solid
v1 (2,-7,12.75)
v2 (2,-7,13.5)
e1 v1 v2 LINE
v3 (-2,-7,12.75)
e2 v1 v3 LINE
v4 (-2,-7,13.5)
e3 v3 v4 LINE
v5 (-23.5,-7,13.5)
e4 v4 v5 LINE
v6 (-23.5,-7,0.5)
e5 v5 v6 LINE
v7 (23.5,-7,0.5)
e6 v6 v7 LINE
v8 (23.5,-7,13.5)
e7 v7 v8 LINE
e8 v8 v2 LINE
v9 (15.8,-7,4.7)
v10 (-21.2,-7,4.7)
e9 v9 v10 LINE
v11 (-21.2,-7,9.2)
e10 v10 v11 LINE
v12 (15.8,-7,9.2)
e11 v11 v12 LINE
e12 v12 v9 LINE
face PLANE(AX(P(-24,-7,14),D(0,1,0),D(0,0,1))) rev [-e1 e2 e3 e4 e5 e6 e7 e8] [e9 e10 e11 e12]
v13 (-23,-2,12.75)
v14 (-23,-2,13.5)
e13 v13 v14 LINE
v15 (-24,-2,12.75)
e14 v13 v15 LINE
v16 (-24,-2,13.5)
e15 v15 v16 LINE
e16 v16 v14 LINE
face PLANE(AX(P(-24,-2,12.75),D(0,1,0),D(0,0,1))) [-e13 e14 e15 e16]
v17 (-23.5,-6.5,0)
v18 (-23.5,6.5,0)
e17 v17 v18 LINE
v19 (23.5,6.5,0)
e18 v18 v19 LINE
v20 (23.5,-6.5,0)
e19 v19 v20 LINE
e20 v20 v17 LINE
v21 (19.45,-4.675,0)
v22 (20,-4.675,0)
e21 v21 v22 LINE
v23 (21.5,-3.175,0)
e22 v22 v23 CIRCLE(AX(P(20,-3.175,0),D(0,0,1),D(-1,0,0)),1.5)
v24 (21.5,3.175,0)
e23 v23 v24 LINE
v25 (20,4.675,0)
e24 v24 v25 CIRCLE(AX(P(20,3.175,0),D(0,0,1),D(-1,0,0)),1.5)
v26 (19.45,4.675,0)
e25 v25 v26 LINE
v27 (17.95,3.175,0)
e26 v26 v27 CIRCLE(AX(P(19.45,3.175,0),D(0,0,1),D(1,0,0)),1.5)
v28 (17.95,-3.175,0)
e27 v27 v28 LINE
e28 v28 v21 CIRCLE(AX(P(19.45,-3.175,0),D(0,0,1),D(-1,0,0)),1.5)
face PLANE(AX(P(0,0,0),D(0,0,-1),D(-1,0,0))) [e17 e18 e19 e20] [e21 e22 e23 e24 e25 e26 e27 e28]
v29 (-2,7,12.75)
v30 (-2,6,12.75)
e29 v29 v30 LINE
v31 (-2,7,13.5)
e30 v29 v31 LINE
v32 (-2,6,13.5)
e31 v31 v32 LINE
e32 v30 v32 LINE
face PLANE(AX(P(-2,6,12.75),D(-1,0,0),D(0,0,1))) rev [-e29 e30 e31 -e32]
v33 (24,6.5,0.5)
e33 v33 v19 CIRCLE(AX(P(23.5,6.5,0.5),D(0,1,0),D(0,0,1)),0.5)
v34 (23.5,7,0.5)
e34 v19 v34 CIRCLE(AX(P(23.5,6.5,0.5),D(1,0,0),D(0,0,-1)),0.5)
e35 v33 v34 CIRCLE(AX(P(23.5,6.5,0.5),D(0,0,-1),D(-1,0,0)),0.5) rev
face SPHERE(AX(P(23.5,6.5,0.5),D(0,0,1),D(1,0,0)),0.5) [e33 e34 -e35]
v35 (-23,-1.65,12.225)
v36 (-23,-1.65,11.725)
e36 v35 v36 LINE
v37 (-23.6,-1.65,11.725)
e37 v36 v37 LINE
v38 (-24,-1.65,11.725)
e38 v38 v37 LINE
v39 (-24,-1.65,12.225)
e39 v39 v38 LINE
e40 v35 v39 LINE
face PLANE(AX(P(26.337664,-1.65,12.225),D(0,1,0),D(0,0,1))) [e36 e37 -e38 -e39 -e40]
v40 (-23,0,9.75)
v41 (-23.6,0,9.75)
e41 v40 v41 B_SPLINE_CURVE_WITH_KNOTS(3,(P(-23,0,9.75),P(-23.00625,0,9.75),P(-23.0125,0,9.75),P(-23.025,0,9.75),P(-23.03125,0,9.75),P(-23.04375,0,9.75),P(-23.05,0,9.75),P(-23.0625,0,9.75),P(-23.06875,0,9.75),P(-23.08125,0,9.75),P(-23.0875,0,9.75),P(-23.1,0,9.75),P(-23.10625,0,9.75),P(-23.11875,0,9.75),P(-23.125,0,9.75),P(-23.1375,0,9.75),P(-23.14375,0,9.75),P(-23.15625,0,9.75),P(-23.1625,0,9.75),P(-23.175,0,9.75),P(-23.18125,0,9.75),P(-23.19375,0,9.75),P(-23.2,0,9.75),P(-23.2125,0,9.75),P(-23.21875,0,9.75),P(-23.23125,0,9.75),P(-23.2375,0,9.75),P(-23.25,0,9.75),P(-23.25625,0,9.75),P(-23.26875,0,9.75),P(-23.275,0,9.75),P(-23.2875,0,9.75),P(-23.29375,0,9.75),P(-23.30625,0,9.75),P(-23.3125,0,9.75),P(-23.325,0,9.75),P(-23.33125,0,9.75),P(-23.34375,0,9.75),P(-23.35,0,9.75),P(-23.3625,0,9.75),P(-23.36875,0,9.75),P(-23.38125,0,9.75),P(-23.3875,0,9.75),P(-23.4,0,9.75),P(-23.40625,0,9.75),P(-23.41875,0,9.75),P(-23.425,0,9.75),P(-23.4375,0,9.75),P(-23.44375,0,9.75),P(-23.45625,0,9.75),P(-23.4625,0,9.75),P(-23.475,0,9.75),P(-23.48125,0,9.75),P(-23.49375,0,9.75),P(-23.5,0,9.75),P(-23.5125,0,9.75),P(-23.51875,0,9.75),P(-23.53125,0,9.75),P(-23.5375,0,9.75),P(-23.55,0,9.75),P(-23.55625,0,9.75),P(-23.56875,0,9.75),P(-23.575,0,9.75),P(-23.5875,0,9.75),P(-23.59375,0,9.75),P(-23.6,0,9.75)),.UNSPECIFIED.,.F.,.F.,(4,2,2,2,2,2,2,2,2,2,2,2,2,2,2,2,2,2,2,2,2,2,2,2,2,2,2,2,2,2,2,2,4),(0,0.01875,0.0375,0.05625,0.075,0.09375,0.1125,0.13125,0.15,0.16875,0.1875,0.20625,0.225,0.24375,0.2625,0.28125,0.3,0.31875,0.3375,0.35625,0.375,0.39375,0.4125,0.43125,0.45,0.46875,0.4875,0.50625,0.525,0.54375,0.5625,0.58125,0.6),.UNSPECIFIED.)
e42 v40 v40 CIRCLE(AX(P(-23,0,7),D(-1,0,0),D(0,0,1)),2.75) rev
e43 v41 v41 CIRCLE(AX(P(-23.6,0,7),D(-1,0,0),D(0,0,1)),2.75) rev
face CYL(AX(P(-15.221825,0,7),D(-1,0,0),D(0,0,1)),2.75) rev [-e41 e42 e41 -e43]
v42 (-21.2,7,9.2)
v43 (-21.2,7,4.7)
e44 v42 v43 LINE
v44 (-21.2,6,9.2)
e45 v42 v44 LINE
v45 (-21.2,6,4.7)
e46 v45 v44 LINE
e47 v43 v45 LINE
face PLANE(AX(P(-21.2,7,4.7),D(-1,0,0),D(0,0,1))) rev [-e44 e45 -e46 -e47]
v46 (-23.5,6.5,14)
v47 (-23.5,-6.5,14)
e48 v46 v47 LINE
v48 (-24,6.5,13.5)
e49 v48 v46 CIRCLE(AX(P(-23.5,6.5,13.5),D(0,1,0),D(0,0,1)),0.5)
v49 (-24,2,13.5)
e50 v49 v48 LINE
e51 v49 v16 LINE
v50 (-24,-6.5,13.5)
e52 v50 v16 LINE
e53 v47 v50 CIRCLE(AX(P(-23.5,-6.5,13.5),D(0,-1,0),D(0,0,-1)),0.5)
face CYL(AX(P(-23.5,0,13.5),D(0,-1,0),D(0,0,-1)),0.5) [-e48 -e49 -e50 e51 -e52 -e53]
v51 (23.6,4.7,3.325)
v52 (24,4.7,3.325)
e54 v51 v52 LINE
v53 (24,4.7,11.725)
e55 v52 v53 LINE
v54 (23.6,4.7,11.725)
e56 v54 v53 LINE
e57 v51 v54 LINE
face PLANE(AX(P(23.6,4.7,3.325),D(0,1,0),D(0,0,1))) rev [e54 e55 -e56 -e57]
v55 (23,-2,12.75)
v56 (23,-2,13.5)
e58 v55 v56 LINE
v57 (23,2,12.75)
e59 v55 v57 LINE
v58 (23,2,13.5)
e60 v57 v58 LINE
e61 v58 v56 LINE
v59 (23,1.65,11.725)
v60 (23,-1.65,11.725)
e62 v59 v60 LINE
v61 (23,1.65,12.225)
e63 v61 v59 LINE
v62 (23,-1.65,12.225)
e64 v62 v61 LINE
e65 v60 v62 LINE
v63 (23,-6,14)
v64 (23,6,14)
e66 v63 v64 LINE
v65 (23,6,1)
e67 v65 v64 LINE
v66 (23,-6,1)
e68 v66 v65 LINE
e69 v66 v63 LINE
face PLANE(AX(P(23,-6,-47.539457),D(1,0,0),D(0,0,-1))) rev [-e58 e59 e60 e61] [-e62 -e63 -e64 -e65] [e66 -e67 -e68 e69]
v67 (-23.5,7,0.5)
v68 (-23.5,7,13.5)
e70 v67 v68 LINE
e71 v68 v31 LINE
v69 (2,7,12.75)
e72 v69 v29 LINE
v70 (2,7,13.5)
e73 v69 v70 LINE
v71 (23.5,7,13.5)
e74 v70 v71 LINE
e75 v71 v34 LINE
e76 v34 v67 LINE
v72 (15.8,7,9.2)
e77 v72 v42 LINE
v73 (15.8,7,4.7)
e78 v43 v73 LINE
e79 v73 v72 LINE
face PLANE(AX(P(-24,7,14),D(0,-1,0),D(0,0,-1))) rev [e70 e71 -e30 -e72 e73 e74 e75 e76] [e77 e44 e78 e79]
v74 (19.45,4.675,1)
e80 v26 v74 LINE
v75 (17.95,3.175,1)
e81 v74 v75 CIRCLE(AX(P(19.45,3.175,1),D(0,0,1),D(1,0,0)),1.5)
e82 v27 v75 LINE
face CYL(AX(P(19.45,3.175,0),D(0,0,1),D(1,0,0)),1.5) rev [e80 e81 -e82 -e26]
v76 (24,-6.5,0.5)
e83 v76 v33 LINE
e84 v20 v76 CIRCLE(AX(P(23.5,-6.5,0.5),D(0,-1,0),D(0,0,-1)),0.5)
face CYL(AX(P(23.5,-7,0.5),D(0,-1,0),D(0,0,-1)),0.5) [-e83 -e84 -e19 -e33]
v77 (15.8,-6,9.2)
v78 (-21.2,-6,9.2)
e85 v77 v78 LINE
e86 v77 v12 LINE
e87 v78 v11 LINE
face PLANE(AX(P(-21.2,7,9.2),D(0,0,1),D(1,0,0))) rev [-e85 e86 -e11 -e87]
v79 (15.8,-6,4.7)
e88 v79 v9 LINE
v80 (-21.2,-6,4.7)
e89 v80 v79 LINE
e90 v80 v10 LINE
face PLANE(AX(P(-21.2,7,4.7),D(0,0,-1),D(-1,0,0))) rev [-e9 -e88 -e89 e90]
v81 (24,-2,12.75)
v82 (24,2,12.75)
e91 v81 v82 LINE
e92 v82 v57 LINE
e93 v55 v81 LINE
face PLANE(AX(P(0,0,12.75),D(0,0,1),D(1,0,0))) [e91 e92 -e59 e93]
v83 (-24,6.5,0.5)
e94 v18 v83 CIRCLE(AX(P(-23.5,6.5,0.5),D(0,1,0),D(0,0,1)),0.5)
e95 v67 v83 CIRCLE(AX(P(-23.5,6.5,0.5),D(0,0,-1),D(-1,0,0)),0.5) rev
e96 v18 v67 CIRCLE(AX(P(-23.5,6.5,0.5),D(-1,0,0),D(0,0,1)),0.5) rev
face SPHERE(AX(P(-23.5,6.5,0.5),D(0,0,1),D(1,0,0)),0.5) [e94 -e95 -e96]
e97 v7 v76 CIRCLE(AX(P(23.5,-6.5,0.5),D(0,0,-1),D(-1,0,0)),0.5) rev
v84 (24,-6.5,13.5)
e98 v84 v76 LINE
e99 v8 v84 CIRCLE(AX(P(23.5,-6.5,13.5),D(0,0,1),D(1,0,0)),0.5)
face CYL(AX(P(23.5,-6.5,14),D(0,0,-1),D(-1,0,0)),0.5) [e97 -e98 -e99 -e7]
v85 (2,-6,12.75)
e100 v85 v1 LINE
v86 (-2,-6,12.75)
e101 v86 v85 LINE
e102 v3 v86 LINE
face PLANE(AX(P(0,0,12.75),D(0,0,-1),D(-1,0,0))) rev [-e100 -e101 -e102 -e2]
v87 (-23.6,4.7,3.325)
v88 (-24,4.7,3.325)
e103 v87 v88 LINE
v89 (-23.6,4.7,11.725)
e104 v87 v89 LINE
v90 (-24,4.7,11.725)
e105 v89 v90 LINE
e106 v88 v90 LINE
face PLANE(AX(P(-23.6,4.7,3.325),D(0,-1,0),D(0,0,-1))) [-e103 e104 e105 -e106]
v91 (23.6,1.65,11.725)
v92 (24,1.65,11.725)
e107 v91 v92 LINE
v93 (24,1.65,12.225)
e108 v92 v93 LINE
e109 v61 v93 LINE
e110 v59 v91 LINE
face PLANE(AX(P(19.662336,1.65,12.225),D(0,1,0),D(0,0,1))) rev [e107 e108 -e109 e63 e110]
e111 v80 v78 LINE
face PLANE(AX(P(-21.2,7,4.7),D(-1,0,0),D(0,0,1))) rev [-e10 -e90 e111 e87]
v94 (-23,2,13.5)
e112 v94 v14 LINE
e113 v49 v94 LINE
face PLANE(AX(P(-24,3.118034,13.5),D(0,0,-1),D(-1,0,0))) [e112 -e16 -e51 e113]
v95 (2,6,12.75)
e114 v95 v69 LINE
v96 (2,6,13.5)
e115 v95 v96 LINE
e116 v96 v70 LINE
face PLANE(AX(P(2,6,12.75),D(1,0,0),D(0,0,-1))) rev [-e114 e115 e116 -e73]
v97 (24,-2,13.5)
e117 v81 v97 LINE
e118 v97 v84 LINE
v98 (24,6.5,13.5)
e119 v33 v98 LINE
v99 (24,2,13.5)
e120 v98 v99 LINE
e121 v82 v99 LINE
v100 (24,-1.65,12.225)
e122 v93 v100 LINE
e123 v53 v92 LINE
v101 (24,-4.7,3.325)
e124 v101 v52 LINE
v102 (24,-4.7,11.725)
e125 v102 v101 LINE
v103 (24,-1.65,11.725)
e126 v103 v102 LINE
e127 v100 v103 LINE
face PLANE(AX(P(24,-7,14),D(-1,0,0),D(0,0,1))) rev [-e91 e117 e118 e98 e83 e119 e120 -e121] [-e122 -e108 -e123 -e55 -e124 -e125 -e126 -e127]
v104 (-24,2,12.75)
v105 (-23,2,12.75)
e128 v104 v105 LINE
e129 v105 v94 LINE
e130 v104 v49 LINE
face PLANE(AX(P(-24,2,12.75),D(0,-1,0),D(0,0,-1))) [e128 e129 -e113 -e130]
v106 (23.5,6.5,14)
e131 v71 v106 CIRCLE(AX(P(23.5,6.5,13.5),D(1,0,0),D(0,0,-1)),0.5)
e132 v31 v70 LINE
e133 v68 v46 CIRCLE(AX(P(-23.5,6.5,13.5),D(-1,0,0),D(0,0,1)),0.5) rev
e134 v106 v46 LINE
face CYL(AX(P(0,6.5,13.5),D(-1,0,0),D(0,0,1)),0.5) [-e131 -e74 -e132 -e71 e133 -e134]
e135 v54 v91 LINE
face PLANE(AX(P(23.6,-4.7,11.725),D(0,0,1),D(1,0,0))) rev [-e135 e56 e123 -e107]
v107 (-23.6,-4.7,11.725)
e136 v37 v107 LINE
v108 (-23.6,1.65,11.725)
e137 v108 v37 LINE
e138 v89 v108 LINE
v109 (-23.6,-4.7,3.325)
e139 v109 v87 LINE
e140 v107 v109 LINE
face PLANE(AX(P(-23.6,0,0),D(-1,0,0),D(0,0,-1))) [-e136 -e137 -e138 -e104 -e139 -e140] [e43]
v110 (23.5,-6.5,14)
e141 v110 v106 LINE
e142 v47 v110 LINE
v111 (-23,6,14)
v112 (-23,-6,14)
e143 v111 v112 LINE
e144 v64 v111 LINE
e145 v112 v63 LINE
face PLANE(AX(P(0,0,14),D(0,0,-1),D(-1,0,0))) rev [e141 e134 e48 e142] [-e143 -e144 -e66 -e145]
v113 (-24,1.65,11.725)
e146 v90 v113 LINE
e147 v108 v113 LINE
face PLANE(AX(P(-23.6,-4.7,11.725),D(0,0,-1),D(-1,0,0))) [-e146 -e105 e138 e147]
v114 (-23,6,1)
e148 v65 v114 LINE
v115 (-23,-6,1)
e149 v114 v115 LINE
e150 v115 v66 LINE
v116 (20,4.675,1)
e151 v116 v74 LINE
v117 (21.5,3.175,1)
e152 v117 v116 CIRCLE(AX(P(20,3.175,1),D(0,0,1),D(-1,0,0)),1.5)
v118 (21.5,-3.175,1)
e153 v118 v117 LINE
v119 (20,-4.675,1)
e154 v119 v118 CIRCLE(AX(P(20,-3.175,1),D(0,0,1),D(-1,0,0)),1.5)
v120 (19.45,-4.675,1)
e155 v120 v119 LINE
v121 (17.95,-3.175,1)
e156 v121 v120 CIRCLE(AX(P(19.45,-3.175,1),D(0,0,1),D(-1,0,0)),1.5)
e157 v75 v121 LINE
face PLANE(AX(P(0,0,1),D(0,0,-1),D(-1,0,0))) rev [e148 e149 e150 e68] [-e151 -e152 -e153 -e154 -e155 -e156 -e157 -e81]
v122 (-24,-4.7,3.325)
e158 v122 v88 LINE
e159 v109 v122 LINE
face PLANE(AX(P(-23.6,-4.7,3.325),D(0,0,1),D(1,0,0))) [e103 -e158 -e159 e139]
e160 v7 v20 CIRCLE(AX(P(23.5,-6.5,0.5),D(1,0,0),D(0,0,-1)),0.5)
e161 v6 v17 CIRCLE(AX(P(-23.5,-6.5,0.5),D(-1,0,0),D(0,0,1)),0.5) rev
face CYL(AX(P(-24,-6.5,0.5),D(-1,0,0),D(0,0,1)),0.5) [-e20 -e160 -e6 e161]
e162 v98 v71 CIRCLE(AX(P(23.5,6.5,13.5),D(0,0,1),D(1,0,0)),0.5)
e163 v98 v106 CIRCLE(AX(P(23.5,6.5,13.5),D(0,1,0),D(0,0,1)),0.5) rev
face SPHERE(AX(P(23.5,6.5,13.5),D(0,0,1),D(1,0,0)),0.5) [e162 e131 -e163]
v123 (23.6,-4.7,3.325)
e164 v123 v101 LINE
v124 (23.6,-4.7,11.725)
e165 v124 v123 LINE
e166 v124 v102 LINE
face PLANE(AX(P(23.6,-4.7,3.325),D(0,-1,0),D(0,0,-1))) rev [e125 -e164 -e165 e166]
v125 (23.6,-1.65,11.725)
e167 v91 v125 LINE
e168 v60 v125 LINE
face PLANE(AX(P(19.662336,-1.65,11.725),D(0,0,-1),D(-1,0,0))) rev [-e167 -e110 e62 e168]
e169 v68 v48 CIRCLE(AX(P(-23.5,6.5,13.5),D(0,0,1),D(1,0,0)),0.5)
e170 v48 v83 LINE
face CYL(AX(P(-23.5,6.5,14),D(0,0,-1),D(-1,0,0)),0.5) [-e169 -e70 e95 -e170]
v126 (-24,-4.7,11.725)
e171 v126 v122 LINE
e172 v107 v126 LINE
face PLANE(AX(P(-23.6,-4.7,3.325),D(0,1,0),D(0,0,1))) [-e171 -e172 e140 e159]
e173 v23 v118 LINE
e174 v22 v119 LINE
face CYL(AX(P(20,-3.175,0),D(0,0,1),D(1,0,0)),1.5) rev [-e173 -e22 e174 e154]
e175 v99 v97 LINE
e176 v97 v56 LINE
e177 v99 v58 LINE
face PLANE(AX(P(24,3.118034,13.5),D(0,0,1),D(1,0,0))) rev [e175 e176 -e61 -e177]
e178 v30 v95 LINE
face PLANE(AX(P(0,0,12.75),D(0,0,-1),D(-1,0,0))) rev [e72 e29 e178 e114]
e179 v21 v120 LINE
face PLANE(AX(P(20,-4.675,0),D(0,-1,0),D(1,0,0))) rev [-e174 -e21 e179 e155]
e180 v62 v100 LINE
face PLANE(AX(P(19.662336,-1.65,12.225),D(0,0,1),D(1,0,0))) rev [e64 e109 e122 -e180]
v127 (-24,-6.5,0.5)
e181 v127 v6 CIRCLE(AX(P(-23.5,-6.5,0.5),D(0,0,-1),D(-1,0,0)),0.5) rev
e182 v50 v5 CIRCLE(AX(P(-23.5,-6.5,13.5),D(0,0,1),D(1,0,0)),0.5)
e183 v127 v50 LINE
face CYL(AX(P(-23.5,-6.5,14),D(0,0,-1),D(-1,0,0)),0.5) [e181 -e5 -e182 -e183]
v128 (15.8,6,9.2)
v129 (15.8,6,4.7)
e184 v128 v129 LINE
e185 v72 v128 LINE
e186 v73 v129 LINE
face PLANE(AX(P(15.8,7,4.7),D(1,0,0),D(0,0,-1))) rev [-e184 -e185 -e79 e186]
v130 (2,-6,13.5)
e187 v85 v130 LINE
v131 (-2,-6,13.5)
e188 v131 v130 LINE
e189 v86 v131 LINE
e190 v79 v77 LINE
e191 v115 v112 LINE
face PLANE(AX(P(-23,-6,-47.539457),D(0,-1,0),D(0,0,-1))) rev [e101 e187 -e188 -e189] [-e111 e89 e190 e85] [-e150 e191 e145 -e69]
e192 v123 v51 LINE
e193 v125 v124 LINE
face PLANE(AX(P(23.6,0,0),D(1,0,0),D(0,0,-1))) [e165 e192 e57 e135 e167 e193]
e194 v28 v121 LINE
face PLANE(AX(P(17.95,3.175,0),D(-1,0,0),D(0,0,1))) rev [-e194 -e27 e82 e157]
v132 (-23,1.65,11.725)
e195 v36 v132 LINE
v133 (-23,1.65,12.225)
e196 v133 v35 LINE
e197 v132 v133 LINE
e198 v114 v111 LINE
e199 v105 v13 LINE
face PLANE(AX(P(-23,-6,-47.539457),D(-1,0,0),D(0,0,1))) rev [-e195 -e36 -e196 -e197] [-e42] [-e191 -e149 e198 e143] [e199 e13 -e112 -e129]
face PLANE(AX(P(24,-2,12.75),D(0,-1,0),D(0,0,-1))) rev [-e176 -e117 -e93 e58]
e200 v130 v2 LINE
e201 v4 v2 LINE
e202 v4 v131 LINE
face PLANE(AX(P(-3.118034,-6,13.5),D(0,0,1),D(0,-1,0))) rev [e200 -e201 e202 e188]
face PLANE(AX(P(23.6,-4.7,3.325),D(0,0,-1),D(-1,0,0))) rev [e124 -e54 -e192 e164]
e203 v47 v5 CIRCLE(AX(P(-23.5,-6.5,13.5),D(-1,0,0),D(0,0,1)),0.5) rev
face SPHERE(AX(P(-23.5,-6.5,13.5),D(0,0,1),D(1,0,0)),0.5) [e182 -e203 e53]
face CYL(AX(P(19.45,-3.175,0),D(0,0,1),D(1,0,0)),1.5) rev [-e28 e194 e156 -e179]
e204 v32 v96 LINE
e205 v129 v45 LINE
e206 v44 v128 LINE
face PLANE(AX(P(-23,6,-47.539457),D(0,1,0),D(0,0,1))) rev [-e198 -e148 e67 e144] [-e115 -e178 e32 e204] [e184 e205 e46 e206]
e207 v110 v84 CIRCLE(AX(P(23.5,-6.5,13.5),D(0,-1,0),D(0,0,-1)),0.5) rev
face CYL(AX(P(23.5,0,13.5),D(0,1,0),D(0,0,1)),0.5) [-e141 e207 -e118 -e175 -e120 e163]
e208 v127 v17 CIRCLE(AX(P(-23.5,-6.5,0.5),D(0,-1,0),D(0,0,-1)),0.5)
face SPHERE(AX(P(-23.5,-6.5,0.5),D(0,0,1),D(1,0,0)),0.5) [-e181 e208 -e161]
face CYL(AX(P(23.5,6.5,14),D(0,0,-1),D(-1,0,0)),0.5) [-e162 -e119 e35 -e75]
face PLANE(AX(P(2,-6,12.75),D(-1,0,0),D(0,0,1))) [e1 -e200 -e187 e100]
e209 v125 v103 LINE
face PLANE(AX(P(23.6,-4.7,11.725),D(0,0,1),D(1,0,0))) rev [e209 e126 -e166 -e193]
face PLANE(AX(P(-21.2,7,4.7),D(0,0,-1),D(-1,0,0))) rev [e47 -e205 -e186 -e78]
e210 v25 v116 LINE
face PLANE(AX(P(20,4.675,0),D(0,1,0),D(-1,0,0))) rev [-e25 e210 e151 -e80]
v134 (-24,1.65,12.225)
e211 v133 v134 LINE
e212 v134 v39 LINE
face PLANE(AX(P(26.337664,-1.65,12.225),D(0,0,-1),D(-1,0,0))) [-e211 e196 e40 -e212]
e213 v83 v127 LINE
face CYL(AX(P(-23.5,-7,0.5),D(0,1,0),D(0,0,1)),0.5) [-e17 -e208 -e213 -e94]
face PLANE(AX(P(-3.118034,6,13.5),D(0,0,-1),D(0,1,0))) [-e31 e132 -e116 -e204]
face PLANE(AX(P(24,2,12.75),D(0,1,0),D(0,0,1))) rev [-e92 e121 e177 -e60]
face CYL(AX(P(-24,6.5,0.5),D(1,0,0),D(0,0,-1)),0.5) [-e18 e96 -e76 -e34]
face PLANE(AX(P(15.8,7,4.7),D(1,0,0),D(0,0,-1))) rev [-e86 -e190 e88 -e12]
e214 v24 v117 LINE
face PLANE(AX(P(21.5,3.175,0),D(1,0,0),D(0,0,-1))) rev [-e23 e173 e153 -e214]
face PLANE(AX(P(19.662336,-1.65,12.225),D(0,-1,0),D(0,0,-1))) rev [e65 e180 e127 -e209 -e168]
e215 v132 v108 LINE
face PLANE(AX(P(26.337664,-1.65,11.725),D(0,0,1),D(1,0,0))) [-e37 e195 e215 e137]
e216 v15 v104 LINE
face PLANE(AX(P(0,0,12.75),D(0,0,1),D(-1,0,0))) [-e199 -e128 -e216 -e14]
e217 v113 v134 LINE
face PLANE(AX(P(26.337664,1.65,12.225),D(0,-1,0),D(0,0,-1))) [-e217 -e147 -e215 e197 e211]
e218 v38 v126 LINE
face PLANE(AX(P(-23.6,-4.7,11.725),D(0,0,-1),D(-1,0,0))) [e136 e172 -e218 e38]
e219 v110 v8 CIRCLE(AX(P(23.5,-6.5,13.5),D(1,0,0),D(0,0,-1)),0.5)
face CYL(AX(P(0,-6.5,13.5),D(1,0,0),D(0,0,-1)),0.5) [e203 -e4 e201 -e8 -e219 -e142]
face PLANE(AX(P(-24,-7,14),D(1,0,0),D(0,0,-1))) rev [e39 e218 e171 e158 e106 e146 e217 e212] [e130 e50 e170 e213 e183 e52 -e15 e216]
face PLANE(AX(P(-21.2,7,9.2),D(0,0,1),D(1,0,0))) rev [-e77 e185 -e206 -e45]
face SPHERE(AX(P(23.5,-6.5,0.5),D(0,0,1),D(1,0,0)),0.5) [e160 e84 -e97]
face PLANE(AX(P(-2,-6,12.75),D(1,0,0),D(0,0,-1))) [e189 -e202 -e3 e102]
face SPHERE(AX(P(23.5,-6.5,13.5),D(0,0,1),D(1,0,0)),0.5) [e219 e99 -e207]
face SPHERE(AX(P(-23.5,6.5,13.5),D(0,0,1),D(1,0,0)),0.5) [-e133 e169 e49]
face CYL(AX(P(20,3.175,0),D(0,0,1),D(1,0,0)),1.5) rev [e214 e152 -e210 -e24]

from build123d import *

# Parameters (mm, degrees)
SKETCH3_W               = 48
SKETCH3_H               = 14
BOSS_EXTRUDE2_DEPTH     = 14
SKETCH4_W               = 46
SKETCH4_H               = 12
CUT_EXTRUDE1_DEPTH      = 13
FILLET1_R               = 0.5
CUT_EXTRUDE2_DEPTH      = 32.112698372
CUT_EXTRUDE2_DEPTH_BACK = 32.112698372
SKETCH6_W               = 37
SKETCH6_H               = 4.5
SKETCH14_W              = 4
SKETCH14_H              = 1
CUT_EXTRUDE8_DEPTH      = 1.25
SKETCH15_W              = 1
SKETCH15_H              = 4
CUT_EXTRUDE9_DEPTH      = 1.25
CUT_EXTRUDE10_DEPTH     = 29.178005607
SKETCH20_W              = 1.2
SKETCH20_H              = 11
BOSS_EXTRUDE3_DEPTH     = 3
FILLET2_R               = 0.5
FILLET2_OF_MIRROR4_R    = 0.5
SKETCH24_R              = 2.75
CUT_EXTRUDE14_DEPTH     = 1
SKETCH25_W              = 0.6
SKETCH25_H              = 12
BOSS_EXTRUDE4_DEPTH     = 2.3
SKETCH28_W              = 8.4
SKETCH28_H              = 9.4
CUT_EXTRUDE15_DEPTH     = 0.4
SKETCH30_W              = 0.7
SKETCH30_H              = 12
BOSS_EXTRUDE6_DEPTH     = 11.75
CUT_EXTRUDE22_REACH     = 52.488
SKETCH38_W              = 0.5
SKETCH38_H              = 3.3
SKETCH39_W              = 0.6
SKETCH39_H              = 1.25
BOSS_EXTRUDE7_DEPTH     = 8.7
FILLET5_R               = 5
MIRROR5_START           = 3.325
MIRROR5_OUTLINE_W       = 0.4
MIRROR5_OUTLINE_H       = 9.4
MIRROR5_DEPTH           = 8.4
MIRROR5_START_2         = 11.725
MIRROR5_2_OUTLINE_W     = 1
MIRROR5_2_OUTLINE_H     = 3.3
MIRROR5_2_OUTLINE_W_2   = 0.7
MIRROR5_2_DEPTH         = 0.5
SKETCH36_W              = 0.7
SKETCH36_H              = 12
CUT_EXTRUDE23_DEPTH     = 11.75
SKETCH40_W              = 1.8
SKETCH40_H              = 12
CUT_EXTRUDE24_DEPTH     = 11
BOSS_EXTRUDE8_START     = 4
BOSS_EXTRUDE8_DEPTH     = 4
BOSS_EXTRUDE9_DEPTH     = 4


# Read off the part's stored shape, not the designer's step: Mirror5
with BuildPart() as part:
    # Sketch3 → Boss-Extrude2 (new body)
    with BuildSketch(Plane.XY):
        Rectangle(SKETCH3_W, SKETCH3_H)
    extrude(amount=BOSS_EXTRUDE2_DEPTH)

    # Sketch4 → Cut-Extrude1 (cut)
    with BuildSketch(Plane.XY.offset(14)):
        Rectangle(SKETCH4_W, SKETCH4_H)
    extrude(amount=-CUT_EXTRUDE1_DEPTH, mode=Mode.SUBTRACT)

    # Fillet1
    fillet1_edges = [part.edges().sort_by_distance(p)[0] for p in [
        (-24, 0, 14),
        (0, -7, 14),
        (24, 0, 14),
        (0, -7, 0),
        (-24, 0, 0),
        (0, 7, 0),
        (24, 0, 0),
        (24, -7, 7),
        (-24, -7, 7),
        (-24, 7, 7),
        (24, 7, 7),
        (0, 7, 14),
    ]]
    fillet(fillet1_edges, radius=FILLET1_R)

    # Sketch6 → Cut-Extrude2 (cut, two sides: drawn at the far end of the back side and taken through both)
    with BuildSketch(Plane.XZ.offset(7).offset(-CUT_EXTRUDE2_DEPTH_BACK)):
        with Locations((-2.7, 6.95)):
            Rectangle(SKETCH6_W, SKETCH6_H)
    extrude(amount=CUT_EXTRUDE2_DEPTH + CUT_EXTRUDE2_DEPTH_BACK, mode=Mode.SUBTRACT)

    # Sketch14 → Cut-Extrude8 (cut)
    with BuildSketch(Plane.XY.offset(14)):
        with Locations((0, 6.5)):
            Rectangle(SKETCH14_W, SKETCH14_H)
    cut_extrude8 = extrude(amount=-CUT_EXTRUDE8_DEPTH, mode=Mode.SUBTRACT)

    # Mirror1: Cut-Extrude8 across plane
    add(cut_extrude8.mirror(Plane(origin=(0, 0, 0), x_dir=(0, 0, 1), z_dir=(0, -1, 0))), mode=Mode.SUBTRACT)

    # Sketch15 → Cut-Extrude9 (cut)
    with BuildSketch(Plane.XY.offset(14)):
        with Locations((23.5, 0)):
            Rectangle(SKETCH15_W, SKETCH15_H)
    cut_extrude9 = extrude(amount=-CUT_EXTRUDE9_DEPTH, mode=Mode.SUBTRACT)

    # Mirror3: Cut-Extrude9 across plane
    add(cut_extrude9.mirror(Plane.ZY), mode=Mode.SUBTRACT)

    # Sketch17 → Cut-Extrude10 (cut, through all)
    with BuildSketch(Plane.XY.offset(1)):
        with BuildLine():
            Line((20, 4.675), (19.45, 4.675))
            ThreePointArc((19.45, 4.675), (18.389339828, 4.235660172), (17.95, 3.175))
            Line((17.95, 3.175), (17.95, -3.175))
            ThreePointArc((17.95, -3.175), (18.389339828, -4.235660172), (19.45, -4.675))
            Line((19.45, -4.675), (20, -4.675))
            ThreePointArc((20, -4.675), (21.060660172, -4.235660172), (21.5, -3.175))
            Line((21.5, -3.175), (21.5, 3.175))
            ThreePointArc((21.5, 3.175), (21.060660172, 4.235660172), (20, 4.675))
        make_face()
    extrude(amount=-CUT_EXTRUDE10_DEPTH, mode=Mode.SUBTRACT)

    # Sketch20 → Boss-Extrude3 (add)
    with BuildSketch(Plane(origin=(0, -6, 0), x_dir=(1, 0, 0), z_dir=(0, 1, 0))):
        with Locations((-21.8, -6.5)):
            Rectangle(SKETCH20_W, SKETCH20_H)
    boss_extrude3 = extrude(amount=BOSS_EXTRUDE3_DEPTH)

    # Fillet2
    fillet2_edges = [part.edges().sort_by_distance(p)[0] for p in [
        (-21.2, -3, 6.5),
        (-22.4, -3, 6.5),
    ]]
    fillet(fillet2_edges, radius=FILLET2_R)

    # Mirror4: Boss-Extrude3 across plane
    add(boss_extrude3.mirror(Plane(origin=(0, 0, 0), x_dir=(0, 0, 1), z_dir=(0, -1, 0))))

    # Fillet2 of Mirror4
    fillet2_of_mirror4_edges = [part.edges().sort_by_distance(p)[0] for p in [
        (-21.2, 3, 6.5),
        (-22.4, 3, 6.5),
    ]]
    fillet(fillet2_of_mirror4_edges, radius=FILLET2_OF_MIRROR4_R)

    # Sketch24 → Cut-Extrude14 (cut)
    with BuildSketch(Plane.ZY.offset(24)):
        with Locations((7, 0)):
            Circle(SKETCH24_R)
    extrude(amount=-CUT_EXTRUDE14_DEPTH, mode=Mode.SUBTRACT)

    # Sketch25 → Boss-Extrude4 (add)
    with BuildSketch(Plane.XY.offset(1)):
        with Locations((-22.7, 0)):
            Rectangle(SKETCH25_W, SKETCH25_H)
    extrude(amount=BOSS_EXTRUDE4_DEPTH)

    # Sketch28 → Cut-Extrude15 (cut)
    with BuildSketch(Plane(origin=(24, 0, 0), x_dir=(0, 0, -1), z_dir=(1, 0, 0))):
        with Locations((-7.525, 0)):
            Rectangle(SKETCH28_W, SKETCH28_H)
    extrude(amount=-CUT_EXTRUDE15_DEPTH, mode=Mode.SUBTRACT)

    # Sketch30 → Boss-Extrude6 (add)
    with BuildSketch(Plane.XY.offset(1)):
        with Locations((22.65, 0)):
            Rectangle(SKETCH30_W, SKETCH30_H)
    extrude(amount=BOSS_EXTRUDE6_DEPTH)

    # Cut-Extrude22: up to this face of the body (flat: up to its plane)
    cut_extrude22_end = Plane(part.part.faces().sort_by_distance((23, 4, 13.375))[0])
    # Sketch38 → Cut-Extrude22 (cut, up to the picked face)
    with BuildSketch(Plane(origin=(24, 0, 0), x_dir=(0, 0, -1), z_dir=(1, 0, 0)), mode=Mode.PRIVATE) as cut_extrude22_sk1:
        with Locations((-11.975, 0)):
            Rectangle(SKETCH38_W, SKETCH38_H)
    cut_extrude22_tool1 = split(extrude(cut_extrude22_sk1.sketch, amount=-CUT_EXTRUDE22_REACH, mode=Mode.PRIVATE), bisect_by=cut_extrude22_end, keep=Keep.BOTH, mode=Mode.PRIVATE)
    add(cut_extrude22_tool1.solids().sort_by(Axis((24, 0, 11.975), (-1, 0, 0)))[0], mode=Mode.SUBTRACT)

    # Sketch39 → Boss-Extrude7 (add)
    with BuildSketch(Plane.XY.offset(3.3)):
        with Locations((-22.7, 5.375)):
            Rectangle(SKETCH39_W, SKETCH39_H)
        with Locations((-22.7, -5.375)):
            Rectangle(SKETCH39_W, SKETCH39_H)
    extrude(amount=BOSS_EXTRUDE7_DEPTH)

    # Fillet5
    # the kernel refuses this fillet: 5 mm, written as the material it takes off along each edge
    with BuildSketch(Plane(origin=(-23, 4.75, 12), x_dir=(0, 1, 0), z_dir=(1, 0, 0))) as fillet5_piece_1:
        with BuildLine():
            CenterArc((5, -3.307189139), FILLET5_R, 138.590377891, 41.409622109)
            Line((0, -3.307189139), (0, 0))
            Line((0, 0), (1.25, 0))
        make_face()
    extrude(amount=0.6, mode=Mode.SUBTRACT)
    with BuildSketch(Plane(origin=(-23, -4.75, 12), x_dir=(0, 0, -1), z_dir=(1, 0, 0))) as fillet5_piece_2:
        with BuildLine():
            CenterArc((3.307189139, -5), FILLET5_R, 90, 41.409622109)
            Line((0, -1.25), (0, 0))
            Line((0, 0), (3.307189139, 0))
        make_face()
    extrude(amount=0.6, mode=Mode.SUBTRACT)

    # Mirror5 outline → Mirror5 (cut)
    with BuildSketch(Plane.XY.offset(MIRROR5_START)):
        with Locations((-23.8, 0)):
            Rectangle(MIRROR5_OUTLINE_W, MIRROR5_OUTLINE_H)
    extrude(amount=MIRROR5_DEPTH, mode=Mode.SUBTRACT)

    # Mirror5 2 outline → Mirror5 2 (cut)
    with BuildSketch(Plane.XY.offset(MIRROR5_START_2)):
        with Locations((-23.5, 0)):
            Rectangle(MIRROR5_2_OUTLINE_W, MIRROR5_2_OUTLINE_H)
        with Locations((22.65, 0)):
            Rectangle(MIRROR5_2_OUTLINE_W_2, MIRROR5_2_OUTLINE_H)
    extrude(amount=MIRROR5_2_DEPTH, mode=Mode.SUBTRACT)

    # Sketch36 → Cut-Extrude23 (cut)
    with BuildSketch(Plane.XY.offset(12.75)):
        with Locations((22.65, 0)):
            Rectangle(SKETCH36_W, SKETCH36_H)
    extrude(amount=-CUT_EXTRUDE23_DEPTH, mode=Mode.SUBTRACT)

    # Sketch40 → Cut-Extrude24 (cut)
    with BuildSketch(Plane.XY.offset(12)):
        with Locations((-22.1, 0)):
            Rectangle(SKETCH40_W, SKETCH40_H)
    extrude(amount=-CUT_EXTRUDE24_DEPTH, mode=Mode.SUBTRACT)

    # Sketch41 → Boss-Extrude8 (add)
    with BuildSketch(Plane(origin=(0, -2, 0), x_dir=(1, 0, 0), z_dir=(0, 1, 0)).offset(BOSS_EXTRUDE8_START)):
        with BuildLine():
            Line((24, -13.5), (23, -13.5))
            Line((23, -13.5), (23, -14))
            Line((23, -14), (23.5, -14))
            ThreePointArc((23.5, -14), (23.853553391, -13.853553391), (24, -13.5))
        make_face()
    boss_extrude8 = extrude(amount=-BOSS_EXTRUDE8_DEPTH)

    # Mirror6: Boss-Extrude8 across plane
    add(boss_extrude8.mirror(Plane.ZY))

    # Sketch42 → Boss-Extrude9 (add)
    with BuildSketch(Plane.ZY.offset(-2)):
        with BuildLine():
            Line((14, -6), (14, -6.5))
            ThreePointArc((14, -6.5), (13.853553391, -6.853553391), (13.5, -7))
            Line((13.5, -7), (13.5, -6))
            Line((13.5, -6), (14, -6))
        make_face()
    boss_extrude9 = extrude(amount=BOSS_EXTRUDE9_DEPTH)

    # Mirror7: Boss-Extrude9 across plane
    add(boss_extrude9.mirror(Plane(origin=(0, 0, 0), x_dir=(0, 0, 1), z_dir=(0, -1, 0))))


solid = part.part
